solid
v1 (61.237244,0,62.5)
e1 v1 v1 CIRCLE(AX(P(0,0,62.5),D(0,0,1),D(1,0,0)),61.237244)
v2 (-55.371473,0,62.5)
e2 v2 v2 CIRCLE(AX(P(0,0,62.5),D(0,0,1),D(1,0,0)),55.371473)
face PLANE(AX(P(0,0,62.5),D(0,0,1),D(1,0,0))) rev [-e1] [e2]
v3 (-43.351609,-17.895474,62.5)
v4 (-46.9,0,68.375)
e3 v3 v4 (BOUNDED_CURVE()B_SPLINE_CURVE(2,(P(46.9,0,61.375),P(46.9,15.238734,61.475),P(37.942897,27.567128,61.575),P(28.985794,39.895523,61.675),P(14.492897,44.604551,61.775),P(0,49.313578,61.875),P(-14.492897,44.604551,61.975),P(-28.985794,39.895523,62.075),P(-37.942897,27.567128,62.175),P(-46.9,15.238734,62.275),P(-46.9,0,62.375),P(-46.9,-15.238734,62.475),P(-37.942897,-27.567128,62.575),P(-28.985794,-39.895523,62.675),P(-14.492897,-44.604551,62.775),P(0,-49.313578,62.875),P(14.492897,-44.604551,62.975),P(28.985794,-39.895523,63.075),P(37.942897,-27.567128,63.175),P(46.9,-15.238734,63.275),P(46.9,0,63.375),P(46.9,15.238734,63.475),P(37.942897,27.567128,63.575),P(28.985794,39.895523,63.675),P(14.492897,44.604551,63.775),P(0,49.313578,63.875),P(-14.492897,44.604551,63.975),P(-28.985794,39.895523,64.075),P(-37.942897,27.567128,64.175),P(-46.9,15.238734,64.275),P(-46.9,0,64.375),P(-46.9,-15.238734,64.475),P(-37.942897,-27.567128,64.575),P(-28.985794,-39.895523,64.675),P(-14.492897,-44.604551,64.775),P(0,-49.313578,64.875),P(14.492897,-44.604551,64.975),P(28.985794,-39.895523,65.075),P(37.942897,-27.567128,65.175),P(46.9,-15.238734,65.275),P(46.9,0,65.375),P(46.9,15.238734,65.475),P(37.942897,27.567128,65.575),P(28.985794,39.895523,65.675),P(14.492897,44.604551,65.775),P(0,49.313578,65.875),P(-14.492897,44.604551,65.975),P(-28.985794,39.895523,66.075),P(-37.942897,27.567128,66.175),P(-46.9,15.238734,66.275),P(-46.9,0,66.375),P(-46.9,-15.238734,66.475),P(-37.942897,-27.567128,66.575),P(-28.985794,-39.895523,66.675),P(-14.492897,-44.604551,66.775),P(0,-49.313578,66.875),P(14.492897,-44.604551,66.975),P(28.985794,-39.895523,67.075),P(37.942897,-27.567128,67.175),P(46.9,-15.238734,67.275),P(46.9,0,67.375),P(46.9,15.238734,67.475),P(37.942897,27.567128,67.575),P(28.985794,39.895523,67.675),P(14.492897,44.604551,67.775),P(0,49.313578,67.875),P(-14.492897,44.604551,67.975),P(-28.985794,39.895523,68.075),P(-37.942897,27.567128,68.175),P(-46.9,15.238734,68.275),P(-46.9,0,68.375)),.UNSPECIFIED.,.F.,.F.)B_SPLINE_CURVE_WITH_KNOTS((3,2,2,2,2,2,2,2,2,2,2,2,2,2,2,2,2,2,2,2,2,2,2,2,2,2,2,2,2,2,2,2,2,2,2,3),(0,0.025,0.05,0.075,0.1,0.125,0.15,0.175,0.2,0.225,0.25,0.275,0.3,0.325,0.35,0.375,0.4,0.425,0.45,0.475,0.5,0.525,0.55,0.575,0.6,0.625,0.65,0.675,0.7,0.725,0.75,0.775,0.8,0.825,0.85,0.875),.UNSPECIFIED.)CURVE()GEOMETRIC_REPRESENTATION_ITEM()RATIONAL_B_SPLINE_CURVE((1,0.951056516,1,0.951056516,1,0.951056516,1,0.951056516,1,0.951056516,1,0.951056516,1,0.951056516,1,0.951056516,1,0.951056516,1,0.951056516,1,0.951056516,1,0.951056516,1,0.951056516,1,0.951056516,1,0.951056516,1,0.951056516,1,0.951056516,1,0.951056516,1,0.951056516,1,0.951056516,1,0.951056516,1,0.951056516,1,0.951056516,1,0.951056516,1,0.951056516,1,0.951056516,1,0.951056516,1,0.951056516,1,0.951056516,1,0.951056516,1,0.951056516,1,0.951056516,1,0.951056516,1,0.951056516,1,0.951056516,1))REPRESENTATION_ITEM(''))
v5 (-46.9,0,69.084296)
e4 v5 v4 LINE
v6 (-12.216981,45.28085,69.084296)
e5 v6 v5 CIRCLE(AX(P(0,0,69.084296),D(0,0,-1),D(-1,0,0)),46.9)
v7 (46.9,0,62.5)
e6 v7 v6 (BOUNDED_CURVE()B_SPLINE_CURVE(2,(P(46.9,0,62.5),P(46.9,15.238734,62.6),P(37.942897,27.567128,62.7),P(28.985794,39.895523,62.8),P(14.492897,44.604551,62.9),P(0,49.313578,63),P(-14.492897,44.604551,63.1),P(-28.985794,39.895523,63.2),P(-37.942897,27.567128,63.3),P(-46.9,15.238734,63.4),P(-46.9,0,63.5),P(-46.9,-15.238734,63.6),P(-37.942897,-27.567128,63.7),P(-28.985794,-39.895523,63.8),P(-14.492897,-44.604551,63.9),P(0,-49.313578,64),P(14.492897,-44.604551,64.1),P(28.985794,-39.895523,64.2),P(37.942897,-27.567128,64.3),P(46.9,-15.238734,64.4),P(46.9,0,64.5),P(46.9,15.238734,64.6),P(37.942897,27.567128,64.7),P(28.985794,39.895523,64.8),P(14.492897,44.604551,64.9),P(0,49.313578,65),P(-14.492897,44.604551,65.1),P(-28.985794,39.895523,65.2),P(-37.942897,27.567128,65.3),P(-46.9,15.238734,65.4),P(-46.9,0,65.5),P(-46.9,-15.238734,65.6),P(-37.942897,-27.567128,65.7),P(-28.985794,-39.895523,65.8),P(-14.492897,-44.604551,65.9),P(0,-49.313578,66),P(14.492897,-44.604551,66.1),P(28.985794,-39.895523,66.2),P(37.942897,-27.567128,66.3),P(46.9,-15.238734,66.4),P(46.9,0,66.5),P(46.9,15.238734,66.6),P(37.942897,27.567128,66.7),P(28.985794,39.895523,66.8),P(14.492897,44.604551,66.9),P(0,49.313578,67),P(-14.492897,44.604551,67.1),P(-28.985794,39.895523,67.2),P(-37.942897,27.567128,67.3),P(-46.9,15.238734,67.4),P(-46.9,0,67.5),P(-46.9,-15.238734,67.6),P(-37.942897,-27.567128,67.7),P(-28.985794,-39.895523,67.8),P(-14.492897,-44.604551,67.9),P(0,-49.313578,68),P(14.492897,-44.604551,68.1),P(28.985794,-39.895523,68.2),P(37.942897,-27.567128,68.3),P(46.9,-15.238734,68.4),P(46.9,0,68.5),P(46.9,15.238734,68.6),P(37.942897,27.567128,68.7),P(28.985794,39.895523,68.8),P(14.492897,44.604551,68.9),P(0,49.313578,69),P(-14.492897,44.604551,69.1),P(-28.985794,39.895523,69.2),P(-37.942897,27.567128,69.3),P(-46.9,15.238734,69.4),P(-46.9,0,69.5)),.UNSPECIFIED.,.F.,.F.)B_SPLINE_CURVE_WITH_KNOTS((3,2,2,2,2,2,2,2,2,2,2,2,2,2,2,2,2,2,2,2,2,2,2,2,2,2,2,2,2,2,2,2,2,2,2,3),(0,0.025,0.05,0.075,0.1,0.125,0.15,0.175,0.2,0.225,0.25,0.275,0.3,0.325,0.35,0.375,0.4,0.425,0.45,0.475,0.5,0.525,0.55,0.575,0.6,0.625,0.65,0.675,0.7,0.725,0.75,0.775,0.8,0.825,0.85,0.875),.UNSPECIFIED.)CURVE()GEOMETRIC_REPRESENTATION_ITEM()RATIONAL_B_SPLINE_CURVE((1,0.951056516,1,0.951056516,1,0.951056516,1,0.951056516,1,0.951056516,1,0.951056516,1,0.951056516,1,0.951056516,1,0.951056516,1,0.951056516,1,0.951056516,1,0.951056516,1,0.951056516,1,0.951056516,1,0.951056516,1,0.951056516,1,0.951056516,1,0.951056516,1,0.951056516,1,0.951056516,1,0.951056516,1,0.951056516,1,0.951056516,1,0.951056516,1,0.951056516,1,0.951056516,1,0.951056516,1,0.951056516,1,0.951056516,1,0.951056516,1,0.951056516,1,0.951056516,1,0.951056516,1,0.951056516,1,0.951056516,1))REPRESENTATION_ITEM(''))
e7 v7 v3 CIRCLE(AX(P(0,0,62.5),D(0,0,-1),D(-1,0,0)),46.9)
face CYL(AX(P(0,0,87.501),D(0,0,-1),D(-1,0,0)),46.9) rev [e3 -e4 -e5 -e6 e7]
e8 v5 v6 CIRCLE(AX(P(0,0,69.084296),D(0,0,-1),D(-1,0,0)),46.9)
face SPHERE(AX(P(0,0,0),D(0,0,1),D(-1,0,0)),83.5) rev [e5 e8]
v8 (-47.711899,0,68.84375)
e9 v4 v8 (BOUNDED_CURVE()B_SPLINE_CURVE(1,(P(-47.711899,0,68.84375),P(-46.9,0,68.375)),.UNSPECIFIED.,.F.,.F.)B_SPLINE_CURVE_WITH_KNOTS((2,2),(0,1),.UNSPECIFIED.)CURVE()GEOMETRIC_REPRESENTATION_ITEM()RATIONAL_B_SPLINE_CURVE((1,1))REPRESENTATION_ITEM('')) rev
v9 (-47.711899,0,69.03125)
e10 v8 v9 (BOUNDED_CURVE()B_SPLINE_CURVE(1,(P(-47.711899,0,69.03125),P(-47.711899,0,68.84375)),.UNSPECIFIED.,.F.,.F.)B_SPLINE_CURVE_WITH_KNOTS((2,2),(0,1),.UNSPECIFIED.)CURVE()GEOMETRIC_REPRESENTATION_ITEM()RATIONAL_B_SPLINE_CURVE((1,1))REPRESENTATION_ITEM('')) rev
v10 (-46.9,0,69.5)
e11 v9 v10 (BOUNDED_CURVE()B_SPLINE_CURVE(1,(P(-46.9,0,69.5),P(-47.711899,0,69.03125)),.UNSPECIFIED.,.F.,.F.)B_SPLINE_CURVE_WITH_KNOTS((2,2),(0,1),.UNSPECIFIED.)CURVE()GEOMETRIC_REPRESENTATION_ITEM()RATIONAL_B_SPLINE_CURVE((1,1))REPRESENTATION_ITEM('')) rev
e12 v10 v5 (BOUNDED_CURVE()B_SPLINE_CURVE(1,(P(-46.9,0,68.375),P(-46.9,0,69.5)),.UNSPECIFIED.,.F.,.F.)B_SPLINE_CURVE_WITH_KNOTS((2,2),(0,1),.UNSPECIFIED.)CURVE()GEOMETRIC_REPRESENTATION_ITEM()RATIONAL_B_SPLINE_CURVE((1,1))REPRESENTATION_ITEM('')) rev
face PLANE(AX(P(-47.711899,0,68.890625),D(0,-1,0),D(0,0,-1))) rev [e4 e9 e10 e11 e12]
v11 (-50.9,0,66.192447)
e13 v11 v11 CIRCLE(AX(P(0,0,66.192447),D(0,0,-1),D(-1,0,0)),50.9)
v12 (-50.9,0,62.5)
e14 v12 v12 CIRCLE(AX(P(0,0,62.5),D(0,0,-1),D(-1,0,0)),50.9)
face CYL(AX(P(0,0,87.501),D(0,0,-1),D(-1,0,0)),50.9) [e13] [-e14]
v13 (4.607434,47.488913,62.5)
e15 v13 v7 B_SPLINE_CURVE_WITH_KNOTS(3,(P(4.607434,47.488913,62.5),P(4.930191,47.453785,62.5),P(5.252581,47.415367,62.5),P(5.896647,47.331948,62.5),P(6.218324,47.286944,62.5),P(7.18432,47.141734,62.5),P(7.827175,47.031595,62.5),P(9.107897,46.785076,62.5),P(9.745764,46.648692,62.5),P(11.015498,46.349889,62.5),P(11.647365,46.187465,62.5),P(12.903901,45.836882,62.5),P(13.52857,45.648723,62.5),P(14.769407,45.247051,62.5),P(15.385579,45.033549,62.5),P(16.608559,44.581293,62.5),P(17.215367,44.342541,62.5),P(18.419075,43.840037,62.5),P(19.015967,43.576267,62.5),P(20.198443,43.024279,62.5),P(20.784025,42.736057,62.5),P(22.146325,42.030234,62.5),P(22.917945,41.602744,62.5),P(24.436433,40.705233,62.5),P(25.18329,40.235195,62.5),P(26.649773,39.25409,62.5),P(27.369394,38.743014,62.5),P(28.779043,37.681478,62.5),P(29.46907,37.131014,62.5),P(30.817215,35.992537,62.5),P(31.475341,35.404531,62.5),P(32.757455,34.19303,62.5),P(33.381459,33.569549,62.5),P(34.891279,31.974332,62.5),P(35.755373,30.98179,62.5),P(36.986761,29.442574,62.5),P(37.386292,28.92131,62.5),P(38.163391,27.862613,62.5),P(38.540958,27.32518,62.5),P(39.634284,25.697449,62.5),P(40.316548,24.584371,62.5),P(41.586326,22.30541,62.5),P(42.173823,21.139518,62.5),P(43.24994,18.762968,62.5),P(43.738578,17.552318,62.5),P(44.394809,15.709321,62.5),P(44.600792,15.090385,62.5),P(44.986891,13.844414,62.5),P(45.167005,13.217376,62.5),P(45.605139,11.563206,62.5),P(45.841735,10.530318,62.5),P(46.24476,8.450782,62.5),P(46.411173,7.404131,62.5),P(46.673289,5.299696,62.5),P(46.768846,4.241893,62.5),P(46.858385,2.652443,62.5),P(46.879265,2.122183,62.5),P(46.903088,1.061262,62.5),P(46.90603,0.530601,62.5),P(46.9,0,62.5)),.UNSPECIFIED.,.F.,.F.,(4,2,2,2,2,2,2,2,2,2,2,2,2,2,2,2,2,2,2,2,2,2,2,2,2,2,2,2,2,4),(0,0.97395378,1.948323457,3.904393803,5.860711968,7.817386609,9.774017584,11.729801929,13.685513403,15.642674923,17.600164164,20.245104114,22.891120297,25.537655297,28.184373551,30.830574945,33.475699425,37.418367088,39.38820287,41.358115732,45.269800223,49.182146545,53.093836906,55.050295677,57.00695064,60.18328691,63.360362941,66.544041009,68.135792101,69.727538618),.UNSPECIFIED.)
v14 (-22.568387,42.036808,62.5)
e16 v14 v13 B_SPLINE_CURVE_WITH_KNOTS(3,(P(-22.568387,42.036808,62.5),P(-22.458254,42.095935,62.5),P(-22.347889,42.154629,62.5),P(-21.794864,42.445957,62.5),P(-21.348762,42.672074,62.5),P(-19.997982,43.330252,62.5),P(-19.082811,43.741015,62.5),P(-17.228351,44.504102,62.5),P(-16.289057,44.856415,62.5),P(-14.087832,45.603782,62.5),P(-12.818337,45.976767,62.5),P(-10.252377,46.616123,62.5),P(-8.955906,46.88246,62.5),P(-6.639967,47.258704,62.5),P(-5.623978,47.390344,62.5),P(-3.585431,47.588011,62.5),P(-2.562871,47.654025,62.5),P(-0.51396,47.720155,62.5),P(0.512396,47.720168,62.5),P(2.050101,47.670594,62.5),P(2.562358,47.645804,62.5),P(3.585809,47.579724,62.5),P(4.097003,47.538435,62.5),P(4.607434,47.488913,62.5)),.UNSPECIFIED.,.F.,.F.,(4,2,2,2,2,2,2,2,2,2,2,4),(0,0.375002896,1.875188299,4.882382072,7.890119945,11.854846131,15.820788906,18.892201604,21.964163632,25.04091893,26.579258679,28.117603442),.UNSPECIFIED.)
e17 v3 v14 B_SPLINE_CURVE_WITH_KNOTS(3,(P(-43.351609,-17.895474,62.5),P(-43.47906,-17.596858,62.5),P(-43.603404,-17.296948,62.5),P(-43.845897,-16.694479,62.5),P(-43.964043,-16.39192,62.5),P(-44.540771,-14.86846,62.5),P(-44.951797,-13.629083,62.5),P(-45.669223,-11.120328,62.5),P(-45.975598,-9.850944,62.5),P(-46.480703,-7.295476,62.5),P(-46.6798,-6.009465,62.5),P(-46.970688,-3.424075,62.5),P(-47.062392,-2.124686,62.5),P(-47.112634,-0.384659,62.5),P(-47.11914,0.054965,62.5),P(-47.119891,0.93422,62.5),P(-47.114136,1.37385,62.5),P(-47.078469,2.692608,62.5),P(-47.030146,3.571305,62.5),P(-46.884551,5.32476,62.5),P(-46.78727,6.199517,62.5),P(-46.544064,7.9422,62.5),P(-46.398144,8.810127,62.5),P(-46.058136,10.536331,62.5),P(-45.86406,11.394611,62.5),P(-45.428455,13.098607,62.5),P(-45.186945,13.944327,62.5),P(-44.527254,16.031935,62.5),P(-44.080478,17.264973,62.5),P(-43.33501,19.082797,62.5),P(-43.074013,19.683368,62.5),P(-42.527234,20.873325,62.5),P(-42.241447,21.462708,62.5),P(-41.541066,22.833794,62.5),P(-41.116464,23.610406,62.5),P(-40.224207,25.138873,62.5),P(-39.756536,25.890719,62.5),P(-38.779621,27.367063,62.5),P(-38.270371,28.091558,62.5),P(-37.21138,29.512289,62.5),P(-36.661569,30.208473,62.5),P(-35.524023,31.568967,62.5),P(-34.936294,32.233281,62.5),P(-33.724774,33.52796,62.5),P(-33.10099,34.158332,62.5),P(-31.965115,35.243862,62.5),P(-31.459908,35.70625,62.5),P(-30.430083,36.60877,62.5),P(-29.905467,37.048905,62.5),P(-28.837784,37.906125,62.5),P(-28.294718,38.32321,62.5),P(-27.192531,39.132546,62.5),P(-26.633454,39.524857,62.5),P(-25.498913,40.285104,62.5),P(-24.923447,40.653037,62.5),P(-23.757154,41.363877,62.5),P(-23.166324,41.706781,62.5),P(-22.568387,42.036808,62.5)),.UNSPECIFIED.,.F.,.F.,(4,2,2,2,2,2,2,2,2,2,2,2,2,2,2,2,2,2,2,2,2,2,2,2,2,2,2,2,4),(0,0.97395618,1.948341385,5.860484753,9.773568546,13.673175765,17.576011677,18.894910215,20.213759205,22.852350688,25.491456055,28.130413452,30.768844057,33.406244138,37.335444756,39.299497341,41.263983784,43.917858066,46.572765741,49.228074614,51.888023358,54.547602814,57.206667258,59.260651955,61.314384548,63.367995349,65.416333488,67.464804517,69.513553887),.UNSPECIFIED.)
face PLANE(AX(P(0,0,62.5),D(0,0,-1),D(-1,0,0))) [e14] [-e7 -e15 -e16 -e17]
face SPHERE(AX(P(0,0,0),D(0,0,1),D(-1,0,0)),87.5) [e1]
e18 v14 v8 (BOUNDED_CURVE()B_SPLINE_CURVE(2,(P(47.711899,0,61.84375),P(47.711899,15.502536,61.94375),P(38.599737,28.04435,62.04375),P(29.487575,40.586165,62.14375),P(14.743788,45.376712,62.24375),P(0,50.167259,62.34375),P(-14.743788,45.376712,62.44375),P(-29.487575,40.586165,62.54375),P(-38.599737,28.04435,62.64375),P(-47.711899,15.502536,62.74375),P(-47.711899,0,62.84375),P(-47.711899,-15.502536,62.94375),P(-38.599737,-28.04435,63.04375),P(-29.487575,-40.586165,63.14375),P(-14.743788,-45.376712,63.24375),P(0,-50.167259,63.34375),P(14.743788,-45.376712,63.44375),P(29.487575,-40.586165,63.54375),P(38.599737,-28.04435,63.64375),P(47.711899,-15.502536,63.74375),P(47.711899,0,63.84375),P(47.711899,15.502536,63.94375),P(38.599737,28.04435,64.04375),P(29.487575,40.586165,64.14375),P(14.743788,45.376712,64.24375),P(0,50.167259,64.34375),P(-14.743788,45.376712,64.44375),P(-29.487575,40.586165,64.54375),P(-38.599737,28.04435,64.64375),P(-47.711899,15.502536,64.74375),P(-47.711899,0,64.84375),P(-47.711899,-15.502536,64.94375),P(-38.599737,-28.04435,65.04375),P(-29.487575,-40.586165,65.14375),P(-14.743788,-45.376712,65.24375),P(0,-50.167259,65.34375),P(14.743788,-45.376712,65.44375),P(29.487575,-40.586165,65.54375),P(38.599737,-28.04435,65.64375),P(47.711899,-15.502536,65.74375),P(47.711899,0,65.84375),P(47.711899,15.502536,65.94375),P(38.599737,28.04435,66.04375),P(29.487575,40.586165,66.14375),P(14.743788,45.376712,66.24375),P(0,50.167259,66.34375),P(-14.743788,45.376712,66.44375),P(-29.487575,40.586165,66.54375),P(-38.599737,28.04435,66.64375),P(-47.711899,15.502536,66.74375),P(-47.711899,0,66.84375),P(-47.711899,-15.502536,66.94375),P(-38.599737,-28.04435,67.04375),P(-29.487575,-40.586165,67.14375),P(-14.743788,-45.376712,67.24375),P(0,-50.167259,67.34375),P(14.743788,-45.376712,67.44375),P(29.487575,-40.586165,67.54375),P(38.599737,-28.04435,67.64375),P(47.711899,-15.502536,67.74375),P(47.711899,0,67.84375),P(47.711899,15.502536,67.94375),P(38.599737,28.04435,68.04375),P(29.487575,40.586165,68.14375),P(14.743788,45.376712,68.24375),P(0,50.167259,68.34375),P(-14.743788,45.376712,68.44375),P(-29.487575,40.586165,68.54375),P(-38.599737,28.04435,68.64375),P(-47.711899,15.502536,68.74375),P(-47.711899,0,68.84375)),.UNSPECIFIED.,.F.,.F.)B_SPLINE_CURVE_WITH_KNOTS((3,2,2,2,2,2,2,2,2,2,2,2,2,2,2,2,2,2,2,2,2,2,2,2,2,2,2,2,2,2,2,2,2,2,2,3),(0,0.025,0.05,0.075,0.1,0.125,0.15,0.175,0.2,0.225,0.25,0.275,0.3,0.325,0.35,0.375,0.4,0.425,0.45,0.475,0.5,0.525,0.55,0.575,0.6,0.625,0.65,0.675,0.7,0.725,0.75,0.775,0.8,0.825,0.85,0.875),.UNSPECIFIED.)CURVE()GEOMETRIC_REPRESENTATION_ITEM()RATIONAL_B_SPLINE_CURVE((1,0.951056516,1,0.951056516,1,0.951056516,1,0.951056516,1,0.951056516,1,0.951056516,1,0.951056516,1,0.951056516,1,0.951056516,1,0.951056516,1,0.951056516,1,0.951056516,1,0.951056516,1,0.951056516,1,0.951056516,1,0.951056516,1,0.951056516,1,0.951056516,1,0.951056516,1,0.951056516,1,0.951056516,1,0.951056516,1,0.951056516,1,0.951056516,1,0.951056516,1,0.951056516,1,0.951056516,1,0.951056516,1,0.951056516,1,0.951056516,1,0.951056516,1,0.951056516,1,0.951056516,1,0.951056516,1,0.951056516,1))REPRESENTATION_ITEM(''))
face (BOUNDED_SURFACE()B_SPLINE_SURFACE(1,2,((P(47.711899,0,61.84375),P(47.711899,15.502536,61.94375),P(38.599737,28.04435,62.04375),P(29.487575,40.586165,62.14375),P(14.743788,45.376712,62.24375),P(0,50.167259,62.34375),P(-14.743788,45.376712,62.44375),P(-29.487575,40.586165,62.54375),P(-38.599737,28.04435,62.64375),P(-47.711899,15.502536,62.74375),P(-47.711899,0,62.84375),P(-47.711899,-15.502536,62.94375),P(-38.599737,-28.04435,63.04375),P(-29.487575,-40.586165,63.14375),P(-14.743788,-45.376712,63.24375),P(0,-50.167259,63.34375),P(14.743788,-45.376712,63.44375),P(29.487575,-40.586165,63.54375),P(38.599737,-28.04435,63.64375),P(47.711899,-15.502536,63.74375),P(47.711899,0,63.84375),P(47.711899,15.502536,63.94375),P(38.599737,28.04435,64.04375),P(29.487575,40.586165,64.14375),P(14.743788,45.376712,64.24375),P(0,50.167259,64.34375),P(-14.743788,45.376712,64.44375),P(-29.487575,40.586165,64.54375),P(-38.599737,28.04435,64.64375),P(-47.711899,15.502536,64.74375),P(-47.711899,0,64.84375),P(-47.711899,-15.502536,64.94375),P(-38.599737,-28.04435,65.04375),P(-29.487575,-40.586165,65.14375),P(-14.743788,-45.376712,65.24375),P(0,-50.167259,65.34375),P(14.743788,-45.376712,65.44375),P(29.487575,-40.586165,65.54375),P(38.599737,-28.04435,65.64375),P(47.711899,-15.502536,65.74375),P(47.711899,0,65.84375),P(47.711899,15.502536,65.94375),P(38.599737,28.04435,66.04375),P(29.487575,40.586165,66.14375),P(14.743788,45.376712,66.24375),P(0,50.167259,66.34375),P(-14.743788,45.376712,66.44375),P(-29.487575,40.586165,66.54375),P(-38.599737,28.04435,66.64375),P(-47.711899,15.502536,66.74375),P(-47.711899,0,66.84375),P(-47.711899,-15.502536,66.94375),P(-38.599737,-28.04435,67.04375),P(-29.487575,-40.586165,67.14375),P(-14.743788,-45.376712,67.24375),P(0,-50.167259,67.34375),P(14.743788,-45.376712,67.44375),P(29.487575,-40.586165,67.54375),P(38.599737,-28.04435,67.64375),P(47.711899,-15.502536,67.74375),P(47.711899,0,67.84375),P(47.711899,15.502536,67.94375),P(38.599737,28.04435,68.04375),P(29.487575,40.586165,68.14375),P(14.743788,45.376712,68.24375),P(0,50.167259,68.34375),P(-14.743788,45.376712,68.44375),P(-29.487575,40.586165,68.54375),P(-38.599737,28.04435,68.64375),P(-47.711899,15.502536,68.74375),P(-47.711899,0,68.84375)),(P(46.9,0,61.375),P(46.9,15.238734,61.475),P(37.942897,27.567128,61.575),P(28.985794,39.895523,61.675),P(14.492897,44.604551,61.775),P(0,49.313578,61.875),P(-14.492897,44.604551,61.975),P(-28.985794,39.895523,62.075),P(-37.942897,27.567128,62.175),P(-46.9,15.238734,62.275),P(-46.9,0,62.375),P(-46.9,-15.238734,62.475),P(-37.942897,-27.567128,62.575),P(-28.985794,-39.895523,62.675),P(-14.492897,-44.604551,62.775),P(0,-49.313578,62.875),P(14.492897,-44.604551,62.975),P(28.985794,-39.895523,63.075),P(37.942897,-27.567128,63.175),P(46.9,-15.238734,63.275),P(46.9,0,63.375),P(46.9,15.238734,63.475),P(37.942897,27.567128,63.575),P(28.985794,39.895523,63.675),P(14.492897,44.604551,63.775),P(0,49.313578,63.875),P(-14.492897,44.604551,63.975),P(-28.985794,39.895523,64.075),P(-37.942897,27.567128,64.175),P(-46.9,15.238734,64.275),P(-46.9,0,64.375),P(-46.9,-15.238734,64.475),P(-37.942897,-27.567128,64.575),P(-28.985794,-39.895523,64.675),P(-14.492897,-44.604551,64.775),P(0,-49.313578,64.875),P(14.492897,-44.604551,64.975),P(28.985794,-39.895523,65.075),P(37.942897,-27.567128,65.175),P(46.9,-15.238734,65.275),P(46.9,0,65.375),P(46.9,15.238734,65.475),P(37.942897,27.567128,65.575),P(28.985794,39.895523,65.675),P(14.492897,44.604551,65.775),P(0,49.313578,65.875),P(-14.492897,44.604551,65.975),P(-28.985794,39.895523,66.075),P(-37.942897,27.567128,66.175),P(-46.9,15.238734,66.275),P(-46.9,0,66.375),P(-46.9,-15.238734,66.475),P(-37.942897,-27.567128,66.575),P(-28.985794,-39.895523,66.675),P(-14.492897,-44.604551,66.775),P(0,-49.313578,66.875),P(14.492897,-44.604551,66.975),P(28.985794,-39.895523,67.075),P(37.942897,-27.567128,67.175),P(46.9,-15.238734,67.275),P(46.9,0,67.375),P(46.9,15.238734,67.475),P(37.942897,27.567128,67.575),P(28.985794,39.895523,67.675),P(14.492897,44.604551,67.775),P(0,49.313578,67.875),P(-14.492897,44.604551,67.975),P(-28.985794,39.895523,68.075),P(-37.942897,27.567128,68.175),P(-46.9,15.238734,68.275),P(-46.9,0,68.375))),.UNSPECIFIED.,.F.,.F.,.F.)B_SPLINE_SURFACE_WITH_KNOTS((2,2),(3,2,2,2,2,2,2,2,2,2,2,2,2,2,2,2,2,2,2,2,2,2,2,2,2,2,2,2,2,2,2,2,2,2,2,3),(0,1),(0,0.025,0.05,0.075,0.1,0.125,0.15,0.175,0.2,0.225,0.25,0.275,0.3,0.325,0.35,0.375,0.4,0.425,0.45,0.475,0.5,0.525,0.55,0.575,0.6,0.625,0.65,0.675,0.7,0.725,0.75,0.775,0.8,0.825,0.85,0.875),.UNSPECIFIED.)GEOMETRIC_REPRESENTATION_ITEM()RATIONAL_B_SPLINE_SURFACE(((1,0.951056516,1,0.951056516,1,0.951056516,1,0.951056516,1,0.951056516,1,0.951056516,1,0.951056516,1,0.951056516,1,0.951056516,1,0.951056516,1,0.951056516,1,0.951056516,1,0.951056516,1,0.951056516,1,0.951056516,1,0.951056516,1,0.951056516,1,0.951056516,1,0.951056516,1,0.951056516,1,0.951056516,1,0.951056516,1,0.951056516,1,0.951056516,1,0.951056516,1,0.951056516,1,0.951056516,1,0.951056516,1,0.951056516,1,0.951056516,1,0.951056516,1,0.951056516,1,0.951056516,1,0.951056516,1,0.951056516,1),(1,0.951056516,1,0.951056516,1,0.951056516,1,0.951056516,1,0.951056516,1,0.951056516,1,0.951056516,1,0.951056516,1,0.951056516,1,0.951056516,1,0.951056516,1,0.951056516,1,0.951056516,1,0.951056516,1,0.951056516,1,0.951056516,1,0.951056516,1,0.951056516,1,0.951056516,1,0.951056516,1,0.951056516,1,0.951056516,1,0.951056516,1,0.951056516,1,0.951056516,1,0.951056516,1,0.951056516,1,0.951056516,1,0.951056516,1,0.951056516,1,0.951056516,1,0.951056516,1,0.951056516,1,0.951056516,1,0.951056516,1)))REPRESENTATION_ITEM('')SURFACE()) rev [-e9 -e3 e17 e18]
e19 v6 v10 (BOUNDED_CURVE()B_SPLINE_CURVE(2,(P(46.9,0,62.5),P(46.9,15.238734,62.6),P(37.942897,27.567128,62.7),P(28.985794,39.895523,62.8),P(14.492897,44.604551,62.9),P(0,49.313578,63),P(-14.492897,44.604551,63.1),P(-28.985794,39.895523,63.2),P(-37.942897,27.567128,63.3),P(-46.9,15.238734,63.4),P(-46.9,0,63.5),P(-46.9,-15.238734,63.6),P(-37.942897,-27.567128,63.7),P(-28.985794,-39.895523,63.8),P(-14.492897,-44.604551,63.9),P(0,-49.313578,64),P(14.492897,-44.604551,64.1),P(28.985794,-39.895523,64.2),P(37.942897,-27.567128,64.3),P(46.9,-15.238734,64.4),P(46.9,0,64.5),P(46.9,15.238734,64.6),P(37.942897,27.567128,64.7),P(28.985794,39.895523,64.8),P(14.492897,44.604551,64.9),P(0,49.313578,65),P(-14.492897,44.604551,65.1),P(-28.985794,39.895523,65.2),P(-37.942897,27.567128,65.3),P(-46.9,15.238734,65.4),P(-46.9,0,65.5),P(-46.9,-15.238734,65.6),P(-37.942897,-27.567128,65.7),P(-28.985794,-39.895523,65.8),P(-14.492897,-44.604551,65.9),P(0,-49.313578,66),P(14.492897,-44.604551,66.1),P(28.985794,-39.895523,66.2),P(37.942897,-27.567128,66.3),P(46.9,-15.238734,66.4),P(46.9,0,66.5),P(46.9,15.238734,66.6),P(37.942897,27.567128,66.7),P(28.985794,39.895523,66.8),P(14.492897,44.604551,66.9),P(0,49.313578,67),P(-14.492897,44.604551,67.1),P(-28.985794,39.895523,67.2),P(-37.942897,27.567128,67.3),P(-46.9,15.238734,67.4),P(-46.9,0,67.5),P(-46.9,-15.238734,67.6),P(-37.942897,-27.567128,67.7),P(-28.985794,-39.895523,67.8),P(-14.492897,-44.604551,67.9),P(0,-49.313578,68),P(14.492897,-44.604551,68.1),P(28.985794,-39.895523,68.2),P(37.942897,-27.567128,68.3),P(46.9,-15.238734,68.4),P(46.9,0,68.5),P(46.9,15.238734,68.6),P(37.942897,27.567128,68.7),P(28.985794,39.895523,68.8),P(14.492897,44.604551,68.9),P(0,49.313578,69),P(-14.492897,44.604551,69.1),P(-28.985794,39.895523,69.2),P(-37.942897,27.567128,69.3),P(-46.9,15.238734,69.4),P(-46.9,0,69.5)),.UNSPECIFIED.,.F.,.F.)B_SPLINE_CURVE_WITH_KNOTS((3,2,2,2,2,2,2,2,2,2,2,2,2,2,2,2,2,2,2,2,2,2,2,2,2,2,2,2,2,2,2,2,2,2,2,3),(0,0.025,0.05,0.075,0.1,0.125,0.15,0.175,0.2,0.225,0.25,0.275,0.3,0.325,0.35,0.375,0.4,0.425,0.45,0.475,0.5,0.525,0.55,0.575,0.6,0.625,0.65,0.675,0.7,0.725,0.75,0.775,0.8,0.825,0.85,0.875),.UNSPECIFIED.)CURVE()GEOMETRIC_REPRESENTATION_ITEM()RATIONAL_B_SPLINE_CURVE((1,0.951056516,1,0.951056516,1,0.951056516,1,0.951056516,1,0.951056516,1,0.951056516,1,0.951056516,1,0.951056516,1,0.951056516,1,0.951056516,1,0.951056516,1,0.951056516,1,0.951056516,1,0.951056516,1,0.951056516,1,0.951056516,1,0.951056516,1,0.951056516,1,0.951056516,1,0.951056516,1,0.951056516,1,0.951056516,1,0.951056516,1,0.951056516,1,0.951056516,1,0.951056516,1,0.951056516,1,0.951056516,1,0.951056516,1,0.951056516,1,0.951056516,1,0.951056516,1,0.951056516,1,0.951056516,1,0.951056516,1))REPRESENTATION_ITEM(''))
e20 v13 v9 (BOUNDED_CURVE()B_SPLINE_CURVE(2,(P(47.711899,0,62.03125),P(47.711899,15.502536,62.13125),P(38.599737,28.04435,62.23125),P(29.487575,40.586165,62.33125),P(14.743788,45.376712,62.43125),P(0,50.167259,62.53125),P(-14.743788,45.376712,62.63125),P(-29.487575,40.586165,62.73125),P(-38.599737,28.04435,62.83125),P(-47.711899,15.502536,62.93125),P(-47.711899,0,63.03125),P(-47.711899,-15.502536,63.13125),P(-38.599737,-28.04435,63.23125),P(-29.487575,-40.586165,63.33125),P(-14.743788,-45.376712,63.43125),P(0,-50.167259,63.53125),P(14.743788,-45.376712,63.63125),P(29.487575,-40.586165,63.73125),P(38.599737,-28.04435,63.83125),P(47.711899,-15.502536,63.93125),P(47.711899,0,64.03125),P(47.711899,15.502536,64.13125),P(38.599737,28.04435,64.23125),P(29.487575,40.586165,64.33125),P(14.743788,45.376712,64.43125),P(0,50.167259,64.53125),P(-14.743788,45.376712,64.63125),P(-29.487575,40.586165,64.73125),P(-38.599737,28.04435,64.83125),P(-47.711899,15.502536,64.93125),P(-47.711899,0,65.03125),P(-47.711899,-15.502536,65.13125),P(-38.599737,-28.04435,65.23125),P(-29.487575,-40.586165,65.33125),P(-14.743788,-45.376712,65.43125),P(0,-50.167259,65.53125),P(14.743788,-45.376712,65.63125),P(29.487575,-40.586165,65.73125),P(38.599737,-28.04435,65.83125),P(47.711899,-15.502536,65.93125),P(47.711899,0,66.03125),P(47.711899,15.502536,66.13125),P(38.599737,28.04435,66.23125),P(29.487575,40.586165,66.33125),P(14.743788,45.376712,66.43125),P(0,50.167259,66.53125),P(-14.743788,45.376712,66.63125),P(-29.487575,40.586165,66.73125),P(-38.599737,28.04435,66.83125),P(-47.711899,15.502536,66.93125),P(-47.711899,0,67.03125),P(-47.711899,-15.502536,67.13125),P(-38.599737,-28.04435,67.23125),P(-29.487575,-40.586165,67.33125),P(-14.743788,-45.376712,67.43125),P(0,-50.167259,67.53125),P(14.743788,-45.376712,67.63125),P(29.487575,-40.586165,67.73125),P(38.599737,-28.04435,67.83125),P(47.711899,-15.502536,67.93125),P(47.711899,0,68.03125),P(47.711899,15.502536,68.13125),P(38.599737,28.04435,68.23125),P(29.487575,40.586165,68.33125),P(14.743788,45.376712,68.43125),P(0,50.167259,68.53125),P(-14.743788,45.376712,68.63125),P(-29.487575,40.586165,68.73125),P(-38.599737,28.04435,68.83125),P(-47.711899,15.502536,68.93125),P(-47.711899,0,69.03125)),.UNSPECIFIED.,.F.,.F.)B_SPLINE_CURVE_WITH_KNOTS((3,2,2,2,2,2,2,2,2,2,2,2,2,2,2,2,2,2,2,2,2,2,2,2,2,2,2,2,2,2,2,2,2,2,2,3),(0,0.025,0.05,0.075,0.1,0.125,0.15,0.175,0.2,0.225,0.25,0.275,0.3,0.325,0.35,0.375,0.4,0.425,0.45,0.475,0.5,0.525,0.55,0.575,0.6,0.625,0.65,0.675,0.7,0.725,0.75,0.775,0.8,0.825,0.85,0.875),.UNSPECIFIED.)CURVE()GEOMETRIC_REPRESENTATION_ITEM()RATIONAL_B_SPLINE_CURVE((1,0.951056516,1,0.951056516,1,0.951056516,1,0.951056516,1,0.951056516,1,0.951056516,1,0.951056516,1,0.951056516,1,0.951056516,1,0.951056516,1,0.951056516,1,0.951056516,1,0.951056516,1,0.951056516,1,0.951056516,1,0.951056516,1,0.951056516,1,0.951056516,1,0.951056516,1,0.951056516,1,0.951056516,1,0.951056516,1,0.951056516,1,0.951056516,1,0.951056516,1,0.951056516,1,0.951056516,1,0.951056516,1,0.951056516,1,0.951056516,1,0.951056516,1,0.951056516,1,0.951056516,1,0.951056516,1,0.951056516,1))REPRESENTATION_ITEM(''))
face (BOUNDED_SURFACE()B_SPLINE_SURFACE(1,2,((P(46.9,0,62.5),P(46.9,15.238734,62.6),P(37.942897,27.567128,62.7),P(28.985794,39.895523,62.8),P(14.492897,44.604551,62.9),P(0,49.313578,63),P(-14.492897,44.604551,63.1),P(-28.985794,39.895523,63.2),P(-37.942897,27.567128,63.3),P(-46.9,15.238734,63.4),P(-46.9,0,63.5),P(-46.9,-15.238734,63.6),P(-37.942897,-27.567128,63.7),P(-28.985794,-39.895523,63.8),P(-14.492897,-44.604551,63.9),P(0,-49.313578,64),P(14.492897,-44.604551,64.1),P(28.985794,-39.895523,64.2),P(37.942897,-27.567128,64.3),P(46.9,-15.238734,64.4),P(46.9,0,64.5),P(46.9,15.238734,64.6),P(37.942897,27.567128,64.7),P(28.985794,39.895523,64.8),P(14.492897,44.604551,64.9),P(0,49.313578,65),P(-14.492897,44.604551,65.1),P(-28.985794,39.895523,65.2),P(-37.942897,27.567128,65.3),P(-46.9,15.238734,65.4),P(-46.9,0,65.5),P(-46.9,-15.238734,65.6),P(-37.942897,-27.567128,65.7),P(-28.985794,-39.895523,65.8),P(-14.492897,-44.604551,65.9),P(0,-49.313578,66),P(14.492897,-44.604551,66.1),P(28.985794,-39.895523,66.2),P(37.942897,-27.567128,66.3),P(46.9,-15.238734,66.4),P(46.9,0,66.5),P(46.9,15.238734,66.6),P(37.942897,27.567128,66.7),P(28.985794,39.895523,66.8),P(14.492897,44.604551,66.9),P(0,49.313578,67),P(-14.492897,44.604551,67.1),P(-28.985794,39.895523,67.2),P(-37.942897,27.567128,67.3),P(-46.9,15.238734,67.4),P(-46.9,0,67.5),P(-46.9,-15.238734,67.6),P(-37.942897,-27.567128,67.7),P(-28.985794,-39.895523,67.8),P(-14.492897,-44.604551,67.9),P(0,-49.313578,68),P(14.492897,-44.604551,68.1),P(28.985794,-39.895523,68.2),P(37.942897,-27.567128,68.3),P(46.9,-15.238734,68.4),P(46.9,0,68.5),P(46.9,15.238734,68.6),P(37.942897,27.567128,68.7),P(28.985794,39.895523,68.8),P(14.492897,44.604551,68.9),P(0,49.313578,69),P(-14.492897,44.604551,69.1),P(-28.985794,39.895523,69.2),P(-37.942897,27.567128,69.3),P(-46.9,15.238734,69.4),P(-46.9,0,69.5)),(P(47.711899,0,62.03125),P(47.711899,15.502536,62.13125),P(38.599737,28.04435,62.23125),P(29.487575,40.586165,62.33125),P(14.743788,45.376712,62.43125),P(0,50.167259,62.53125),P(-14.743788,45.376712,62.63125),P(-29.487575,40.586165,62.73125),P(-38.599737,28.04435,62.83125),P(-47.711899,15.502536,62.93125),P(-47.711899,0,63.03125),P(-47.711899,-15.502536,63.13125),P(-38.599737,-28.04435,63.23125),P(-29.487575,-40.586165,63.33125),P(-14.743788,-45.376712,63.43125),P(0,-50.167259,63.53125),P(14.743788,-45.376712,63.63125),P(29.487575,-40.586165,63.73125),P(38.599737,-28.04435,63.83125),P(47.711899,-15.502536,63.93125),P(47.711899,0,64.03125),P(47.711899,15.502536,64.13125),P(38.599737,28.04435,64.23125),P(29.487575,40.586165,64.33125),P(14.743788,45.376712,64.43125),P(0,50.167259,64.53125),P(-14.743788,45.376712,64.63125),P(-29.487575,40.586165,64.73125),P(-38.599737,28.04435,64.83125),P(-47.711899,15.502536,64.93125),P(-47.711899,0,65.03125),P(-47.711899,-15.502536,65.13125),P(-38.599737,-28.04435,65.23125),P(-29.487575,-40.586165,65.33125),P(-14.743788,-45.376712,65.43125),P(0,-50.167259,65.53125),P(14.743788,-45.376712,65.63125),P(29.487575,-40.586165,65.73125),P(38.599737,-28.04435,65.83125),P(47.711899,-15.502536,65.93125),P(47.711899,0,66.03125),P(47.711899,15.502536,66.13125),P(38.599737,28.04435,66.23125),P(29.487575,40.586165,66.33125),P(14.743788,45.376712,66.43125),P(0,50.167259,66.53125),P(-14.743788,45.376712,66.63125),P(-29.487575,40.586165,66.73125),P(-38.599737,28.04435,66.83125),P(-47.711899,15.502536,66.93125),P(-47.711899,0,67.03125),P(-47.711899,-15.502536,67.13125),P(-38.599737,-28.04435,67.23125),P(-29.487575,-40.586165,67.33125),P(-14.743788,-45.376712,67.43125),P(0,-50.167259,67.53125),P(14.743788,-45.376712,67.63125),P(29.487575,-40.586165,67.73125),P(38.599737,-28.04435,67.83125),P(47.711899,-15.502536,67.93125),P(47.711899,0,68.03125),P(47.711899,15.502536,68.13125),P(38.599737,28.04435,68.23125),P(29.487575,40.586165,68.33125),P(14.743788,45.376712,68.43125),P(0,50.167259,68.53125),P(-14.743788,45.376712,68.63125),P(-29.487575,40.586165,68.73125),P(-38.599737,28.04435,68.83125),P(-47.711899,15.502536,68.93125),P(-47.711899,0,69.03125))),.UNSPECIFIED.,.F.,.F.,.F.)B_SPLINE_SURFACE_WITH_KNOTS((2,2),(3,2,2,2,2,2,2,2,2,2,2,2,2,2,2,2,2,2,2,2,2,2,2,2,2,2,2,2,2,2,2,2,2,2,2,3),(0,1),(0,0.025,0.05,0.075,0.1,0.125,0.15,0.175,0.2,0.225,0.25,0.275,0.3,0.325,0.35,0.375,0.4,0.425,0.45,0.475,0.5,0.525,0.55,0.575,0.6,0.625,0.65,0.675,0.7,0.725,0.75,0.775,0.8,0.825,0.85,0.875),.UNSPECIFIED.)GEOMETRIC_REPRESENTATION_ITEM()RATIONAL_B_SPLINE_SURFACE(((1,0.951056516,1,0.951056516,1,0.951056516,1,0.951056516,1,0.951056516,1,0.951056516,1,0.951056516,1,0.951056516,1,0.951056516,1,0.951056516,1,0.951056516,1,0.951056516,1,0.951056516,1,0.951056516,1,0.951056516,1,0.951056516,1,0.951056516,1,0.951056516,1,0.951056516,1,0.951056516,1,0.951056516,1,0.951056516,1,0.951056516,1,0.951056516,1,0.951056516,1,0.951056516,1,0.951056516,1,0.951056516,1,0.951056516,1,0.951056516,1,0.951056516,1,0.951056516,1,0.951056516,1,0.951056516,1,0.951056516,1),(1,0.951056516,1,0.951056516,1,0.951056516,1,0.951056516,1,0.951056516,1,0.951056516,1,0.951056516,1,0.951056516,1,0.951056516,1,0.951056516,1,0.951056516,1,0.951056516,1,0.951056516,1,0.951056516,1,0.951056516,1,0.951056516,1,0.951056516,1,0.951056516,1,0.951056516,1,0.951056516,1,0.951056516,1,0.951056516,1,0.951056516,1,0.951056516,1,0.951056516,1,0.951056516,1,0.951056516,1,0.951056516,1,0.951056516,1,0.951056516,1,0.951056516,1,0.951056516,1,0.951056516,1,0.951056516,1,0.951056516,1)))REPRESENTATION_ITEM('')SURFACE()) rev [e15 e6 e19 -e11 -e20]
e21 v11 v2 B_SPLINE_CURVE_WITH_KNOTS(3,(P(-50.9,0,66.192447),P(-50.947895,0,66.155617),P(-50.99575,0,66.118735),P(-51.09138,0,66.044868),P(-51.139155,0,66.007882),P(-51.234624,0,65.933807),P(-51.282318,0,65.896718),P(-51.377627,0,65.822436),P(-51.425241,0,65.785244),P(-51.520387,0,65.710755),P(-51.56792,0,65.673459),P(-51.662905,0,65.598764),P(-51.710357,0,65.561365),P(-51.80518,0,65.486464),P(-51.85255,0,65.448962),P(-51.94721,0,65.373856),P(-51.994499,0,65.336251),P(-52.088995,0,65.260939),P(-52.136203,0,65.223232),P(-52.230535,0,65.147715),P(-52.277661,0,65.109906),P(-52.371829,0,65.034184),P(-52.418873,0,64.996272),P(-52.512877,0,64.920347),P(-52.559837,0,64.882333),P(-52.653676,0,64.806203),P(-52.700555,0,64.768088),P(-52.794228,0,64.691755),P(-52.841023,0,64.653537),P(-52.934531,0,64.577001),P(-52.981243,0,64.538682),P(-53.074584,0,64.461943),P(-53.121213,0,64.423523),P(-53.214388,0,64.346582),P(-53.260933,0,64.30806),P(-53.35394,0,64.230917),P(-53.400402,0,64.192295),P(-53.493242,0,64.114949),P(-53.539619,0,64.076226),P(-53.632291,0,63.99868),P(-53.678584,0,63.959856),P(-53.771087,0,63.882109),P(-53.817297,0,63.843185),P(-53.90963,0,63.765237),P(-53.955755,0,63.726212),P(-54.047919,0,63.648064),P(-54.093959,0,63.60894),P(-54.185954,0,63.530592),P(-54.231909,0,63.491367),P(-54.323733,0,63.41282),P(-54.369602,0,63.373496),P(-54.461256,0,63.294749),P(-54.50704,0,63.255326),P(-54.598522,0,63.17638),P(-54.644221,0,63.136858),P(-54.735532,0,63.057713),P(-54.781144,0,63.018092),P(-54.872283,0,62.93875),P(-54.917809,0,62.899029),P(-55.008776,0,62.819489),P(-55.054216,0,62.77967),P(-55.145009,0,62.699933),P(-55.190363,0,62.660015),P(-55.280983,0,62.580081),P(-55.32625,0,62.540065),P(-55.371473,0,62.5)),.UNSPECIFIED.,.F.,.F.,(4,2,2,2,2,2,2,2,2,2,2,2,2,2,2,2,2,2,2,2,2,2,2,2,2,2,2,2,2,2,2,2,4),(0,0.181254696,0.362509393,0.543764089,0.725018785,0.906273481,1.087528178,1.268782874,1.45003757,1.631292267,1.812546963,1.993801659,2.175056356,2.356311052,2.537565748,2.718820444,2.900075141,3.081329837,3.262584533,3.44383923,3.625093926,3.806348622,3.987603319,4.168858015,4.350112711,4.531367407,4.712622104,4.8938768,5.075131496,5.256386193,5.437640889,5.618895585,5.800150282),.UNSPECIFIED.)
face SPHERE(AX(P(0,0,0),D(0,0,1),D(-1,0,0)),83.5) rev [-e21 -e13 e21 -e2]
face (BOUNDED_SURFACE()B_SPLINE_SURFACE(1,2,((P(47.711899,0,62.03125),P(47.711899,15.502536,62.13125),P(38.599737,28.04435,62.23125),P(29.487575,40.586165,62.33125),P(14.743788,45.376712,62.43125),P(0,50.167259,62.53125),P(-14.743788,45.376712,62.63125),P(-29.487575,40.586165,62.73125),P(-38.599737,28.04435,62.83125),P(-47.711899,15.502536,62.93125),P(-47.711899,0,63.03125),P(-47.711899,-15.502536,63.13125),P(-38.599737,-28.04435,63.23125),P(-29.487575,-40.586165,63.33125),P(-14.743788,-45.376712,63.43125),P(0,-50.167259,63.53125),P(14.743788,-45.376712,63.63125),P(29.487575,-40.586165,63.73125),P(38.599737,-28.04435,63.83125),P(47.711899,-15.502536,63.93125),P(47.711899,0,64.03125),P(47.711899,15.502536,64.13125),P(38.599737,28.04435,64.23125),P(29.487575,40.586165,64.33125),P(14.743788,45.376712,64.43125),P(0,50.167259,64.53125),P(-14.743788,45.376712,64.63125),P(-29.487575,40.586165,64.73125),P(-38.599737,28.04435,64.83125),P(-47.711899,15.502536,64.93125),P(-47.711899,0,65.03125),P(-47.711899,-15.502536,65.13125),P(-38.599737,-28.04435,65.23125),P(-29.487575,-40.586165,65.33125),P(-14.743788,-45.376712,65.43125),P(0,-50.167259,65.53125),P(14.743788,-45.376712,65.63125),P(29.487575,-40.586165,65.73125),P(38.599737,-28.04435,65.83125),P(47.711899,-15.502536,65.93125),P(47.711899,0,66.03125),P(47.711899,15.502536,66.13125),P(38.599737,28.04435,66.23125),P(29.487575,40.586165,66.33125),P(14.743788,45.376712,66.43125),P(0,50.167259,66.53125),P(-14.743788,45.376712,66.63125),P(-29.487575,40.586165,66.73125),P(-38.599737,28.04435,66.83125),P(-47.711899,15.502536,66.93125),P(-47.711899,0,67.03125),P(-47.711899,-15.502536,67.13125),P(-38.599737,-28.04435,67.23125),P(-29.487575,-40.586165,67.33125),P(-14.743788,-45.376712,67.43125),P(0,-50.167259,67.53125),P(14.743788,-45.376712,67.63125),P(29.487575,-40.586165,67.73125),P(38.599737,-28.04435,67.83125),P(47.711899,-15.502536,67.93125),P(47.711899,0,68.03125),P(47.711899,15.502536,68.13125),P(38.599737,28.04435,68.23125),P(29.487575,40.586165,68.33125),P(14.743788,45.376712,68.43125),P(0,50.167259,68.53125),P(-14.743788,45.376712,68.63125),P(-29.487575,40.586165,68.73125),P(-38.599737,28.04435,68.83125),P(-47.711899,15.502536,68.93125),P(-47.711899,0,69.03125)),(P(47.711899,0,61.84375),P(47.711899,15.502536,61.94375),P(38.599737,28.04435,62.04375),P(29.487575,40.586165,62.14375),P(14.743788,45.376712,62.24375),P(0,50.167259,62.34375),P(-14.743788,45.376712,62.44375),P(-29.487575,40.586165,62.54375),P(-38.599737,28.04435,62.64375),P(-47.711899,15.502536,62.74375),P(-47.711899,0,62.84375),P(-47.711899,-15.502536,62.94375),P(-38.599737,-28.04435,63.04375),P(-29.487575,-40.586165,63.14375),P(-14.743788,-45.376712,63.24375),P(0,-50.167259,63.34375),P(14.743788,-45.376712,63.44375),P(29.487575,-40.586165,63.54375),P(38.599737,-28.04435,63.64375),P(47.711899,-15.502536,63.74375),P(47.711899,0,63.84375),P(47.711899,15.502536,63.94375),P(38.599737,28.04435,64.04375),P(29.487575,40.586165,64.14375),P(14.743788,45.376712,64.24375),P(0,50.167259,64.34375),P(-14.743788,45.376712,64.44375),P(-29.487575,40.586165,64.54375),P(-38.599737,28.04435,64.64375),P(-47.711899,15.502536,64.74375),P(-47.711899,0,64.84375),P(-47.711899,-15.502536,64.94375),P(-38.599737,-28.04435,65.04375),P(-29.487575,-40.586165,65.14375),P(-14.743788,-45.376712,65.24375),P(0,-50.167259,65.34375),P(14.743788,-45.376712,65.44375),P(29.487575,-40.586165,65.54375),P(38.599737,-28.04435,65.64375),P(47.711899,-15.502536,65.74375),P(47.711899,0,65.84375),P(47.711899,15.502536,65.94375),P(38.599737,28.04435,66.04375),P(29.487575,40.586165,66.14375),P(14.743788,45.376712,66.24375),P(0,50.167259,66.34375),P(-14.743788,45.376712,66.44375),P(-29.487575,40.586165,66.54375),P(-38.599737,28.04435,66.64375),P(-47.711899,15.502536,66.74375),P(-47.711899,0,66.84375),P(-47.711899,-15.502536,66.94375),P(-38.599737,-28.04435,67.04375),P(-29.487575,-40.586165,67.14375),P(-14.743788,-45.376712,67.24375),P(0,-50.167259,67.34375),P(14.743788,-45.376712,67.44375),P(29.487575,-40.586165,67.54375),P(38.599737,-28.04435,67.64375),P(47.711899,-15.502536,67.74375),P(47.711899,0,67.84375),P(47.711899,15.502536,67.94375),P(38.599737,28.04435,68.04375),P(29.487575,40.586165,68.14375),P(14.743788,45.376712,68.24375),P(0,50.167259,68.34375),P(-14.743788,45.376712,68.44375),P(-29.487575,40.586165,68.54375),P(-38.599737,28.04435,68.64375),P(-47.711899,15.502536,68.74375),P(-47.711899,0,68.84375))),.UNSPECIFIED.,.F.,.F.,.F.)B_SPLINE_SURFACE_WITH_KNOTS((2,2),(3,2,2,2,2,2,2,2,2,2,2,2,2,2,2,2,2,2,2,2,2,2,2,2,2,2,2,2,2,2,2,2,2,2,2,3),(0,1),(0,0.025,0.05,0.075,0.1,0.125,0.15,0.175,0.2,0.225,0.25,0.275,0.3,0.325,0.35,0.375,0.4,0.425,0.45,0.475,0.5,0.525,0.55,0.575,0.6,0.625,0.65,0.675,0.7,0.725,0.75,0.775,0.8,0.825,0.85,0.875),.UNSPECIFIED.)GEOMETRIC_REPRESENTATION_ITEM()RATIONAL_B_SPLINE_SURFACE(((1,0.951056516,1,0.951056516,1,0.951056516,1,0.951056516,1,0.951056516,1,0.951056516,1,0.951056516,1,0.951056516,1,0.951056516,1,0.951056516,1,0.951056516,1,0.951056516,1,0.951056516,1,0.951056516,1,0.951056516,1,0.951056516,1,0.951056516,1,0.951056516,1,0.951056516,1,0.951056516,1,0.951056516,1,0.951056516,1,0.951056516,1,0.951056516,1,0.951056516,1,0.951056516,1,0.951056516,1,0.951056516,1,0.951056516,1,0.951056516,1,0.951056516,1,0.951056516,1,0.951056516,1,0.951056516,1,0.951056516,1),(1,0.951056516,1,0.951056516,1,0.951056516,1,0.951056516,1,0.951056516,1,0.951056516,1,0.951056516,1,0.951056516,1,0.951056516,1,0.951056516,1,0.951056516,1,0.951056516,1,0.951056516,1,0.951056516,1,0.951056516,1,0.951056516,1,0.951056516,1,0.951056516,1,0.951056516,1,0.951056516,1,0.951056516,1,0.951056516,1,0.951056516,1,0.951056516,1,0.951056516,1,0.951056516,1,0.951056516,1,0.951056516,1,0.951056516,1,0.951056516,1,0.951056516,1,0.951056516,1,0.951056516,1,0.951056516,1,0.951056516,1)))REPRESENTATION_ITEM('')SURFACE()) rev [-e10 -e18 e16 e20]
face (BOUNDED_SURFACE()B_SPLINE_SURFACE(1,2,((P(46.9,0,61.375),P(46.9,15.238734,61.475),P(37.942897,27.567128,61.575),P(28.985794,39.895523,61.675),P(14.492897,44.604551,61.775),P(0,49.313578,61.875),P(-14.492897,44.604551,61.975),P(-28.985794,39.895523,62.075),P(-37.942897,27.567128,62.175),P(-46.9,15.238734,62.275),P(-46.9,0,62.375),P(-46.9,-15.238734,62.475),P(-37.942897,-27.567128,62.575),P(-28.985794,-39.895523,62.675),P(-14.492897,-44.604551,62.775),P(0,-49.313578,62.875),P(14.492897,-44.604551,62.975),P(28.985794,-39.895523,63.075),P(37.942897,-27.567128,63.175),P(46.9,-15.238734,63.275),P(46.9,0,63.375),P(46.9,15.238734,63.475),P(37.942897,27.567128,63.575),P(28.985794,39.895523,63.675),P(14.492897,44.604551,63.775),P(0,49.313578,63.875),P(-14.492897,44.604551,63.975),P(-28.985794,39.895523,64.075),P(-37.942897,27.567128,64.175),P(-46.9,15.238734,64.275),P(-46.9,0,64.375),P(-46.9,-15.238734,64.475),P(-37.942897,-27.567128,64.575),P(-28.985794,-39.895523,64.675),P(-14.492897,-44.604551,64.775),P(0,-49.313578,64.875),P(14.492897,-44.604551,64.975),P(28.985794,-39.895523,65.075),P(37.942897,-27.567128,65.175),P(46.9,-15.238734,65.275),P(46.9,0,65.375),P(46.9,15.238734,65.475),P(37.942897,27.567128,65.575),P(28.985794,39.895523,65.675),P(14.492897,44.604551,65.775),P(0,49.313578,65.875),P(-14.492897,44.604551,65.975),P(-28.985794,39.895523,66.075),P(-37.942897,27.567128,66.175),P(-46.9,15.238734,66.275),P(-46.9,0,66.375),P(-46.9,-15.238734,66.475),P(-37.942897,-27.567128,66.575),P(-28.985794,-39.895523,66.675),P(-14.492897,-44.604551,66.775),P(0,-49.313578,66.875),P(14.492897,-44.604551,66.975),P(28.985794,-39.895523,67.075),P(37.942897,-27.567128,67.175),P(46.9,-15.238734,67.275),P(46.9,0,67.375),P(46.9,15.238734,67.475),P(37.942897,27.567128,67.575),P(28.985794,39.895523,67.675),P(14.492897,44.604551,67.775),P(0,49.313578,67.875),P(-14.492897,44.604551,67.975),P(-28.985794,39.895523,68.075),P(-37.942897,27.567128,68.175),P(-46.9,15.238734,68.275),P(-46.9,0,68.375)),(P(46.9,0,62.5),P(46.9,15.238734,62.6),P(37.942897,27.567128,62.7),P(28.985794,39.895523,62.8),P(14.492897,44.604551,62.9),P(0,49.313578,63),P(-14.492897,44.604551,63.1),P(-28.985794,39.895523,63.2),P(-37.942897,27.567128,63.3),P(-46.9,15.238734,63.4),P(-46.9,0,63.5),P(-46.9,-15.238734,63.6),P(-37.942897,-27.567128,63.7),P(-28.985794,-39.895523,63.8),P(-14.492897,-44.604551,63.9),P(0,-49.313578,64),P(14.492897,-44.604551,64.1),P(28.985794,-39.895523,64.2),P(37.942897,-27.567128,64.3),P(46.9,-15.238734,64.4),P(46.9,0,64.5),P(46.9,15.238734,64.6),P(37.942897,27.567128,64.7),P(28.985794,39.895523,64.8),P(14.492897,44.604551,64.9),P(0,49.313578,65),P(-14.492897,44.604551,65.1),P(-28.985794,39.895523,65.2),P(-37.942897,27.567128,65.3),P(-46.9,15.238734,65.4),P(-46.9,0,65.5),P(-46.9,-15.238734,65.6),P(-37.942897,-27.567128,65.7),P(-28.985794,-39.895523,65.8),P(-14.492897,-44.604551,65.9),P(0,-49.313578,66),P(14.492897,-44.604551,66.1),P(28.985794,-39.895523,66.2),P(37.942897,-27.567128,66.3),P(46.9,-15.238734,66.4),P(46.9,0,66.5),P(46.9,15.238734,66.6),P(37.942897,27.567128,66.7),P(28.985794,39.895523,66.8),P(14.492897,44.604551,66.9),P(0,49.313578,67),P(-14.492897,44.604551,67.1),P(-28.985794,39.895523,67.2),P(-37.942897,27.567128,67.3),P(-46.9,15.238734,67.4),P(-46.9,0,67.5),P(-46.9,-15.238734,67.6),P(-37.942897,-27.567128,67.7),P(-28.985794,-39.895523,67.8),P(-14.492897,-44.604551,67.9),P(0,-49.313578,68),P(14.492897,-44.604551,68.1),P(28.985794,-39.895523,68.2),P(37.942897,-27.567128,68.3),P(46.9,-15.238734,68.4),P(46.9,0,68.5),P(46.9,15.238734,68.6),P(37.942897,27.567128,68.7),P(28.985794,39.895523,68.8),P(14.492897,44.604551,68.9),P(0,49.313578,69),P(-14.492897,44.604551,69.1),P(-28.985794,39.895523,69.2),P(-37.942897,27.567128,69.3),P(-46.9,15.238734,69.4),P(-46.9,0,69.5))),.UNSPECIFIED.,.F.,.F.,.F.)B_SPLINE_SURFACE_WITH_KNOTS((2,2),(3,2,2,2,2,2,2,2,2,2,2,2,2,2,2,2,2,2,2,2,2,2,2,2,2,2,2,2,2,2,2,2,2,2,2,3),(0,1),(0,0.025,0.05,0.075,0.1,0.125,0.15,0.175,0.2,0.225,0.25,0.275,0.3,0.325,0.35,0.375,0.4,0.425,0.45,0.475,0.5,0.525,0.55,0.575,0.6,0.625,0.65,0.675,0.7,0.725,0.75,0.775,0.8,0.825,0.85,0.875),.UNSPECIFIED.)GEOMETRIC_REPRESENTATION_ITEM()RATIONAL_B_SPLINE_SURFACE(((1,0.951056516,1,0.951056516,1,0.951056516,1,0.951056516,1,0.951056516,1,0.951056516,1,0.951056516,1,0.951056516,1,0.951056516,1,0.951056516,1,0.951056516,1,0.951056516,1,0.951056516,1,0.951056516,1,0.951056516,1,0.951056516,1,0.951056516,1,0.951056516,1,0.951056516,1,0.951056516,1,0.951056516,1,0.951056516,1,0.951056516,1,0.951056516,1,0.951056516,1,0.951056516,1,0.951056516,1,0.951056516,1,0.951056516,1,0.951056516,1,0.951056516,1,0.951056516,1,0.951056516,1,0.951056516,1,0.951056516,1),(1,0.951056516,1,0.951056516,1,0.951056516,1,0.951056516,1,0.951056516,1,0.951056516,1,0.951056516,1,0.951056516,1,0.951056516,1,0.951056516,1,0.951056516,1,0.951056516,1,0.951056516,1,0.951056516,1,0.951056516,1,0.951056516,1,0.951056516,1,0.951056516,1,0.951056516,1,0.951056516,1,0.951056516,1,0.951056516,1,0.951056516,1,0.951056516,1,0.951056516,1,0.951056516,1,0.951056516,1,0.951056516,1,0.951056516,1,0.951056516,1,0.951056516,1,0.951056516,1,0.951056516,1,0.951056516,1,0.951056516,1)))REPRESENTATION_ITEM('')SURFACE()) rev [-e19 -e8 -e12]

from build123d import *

# Parameters (mm, degrees)
SKETCH2_R                       = 50.9
SKETCH2_R_2                     = 46.9
BOSS_EXTRUDE1_DEPTH             = 5
BOSS_EXTRUDE1_DIRECTION_2_REACH = 90.882
THREAD1_PITCH                   = 2


with BuildPart() as part:
    # Sketch1 → Revolve1 (revolve)
    with BuildSketch(Plane(origin=(0, 0, 0), x_dir=(1, 0, 0), z_dir=(0, 1, 0))):
        with BuildLine():
            ThreePointArc((-61.23724357, -62.5), (-33.071891388, -81.00925873), (0, -87.5))
            Line((0, -87.5), (0, -83.5))
            ThreePointArc((0, -83.5), (-29.609964539, -78.073683146), (-55.3714728, -62.5))
            Line((-55.3714728, -62.5), (-61.23724357, -62.5))
        make_face()
    revolve(axis=Axis((0, 0, 87.5), (0, 0, -1)))

    # Sketch2 → Boss-Extrude1 (add)
    with BuildSketch(Plane(origin=(0, 0, 67.5), x_dir=(-1, 0, 0), z_dir=(0, 0, -1))):
        Circle(SKETCH2_R)
        Circle(SKETCH2_R_2, mode=Mode.SUBTRACT)
    extrude(amount=BOSS_EXTRUDE1_DEPTH)

    # Sketch2 → Boss-Extrude1 direction 2 (add, up to next)
    with BuildSketch(Plane(origin=(0, 0, 67.5), x_dir=(-1, 0, 0), z_dir=(0, 0, -1)), mode=Mode.PRIVATE) as boss_extrude1_direction_2_sk1:
        Circle(SKETCH2_R)
        Circle(SKETCH2_R_2, mode=Mode.SUBTRACT)
    boss_extrude1_direction_2_tool1 = extrude(boss_extrude1_direction_2_sk1.sketch, amount=-BOSS_EXTRUDE1_DIRECTION_2_REACH, mode=Mode.PRIVATE) - part.part
    add(boss_extrude1_direction_2_tool1.solids().sort_by_distance((49.460331, 0, 67.5))[0])

    # Thread1: arcs per turn and ends read off the stored shape
    # Thread1: the profile of Thread Profile1 profile screwed along a right-hand helix through 3.5 turns, 10 arcs to a turn; built about Z, then put on its axis
    thread1_z = Axis((0, 0, 0), (0, 0, 1))
    thread1_corners = [(-46.8997, 0, -7.000173205), (-47.711898812, 0, -6.531250002), (-47.711898812, 0, -6.343750002), (-46.8997, 0, -5.874826799)]
    with BuildLine(mode=Mode.PRIVATE) as thread1_profile:
        Line(thread1_corners[0], thread1_corners[1])
        Line(thread1_corners[1], thread1_corners[2])
        Line(thread1_corners[2], thread1_corners[3])
        Line(thread1_corners[3], thread1_corners[0])
    thread1_cap = Face(thread1_profile.wire())
    thread1_turn_angles = [0, 18, 36, 54, 72, 90, 108, 126, 144, 162, 180, 198, 216, 234, 252, 270, 288, 306, 324, 342, 360]
    thread1_turn_weights = [1, 0.9510565162951535, 1, 0.9510565162951535, 1, 0.9510565162951535, 1, 0.9510565162951535, 1, 0.9510565162951535, 1, 0.9510565162951535, 1, 0.9510565162951535, 1, 0.9510565162951535, 1, 0.9510565162951535, 1, 0.9510565162951535, 1]
    thread1_turn_rails = [Edge.make_bspline([Vector(p[0], p[1], 0).rotate(thread1_z, thread1_turn_angles[k]) / thread1_turn_weights[k] + Vector(0, 0, p[2] + THREAD1_PITCH * thread1_turn_angles[k] / 360) for k in range(21)], [0, 0, 0, 1, 1, 2, 2, 3, 3, 4, 4, 5, 5, 6, 6, 7, 7, 8, 8, 9, 9, 10, 10, 10], 2, thread1_turn_weights) for p in thread1_corners]
    thread1_turn_sides = [Face.make_surface_from_curves(thread1_turn_rails[p[0]], thread1_turn_rails[p[1]]) for p in [(0, 1), (1, 2), (2, 3), (3, 0)]]
    thread1_last_angles = [1080, 1098, 1116, 1134, 1152, 1170, 1188, 1206, 1224, 1242, 1260]
    thread1_last_weights = [1, 0.9510565162951535, 1, 0.9510565162951535, 1, 0.9510565162951535, 1, 0.9510565162951535, 1, 0.9510565162951535, 1]
    thread1_last_rails = [Edge.make_bspline([Vector(p[0], p[1], 0).rotate(thread1_z, thread1_last_angles[k]) / thread1_last_weights[k] + Vector(0, 0, p[2] + THREAD1_PITCH * thread1_last_angles[k] / 360) for k in range(11)], [0, 0, 0, 1, 1, 2, 2, 3, 3, 4, 4, 5, 5, 5], 2, thread1_last_weights) for p in thread1_corners]
    thread1_last_sides = [Face.make_surface_from_curves(thread1_last_rails[p[0]], thread1_last_rails[p[1]]) for p in [(0, 1), (1, 2), (2, 3), (3, 0)]]
    thread1 = Plane(origin=(0, 0, 62.5), x_dir=(1, 0, 0), z_dir=(0, 0, -1)) * Solid(Shell([*[p.moved(Location((0, 0, THREAD1_PITCH * i))) for i in range(3) for p in thread1_turn_sides], *thread1_last_sides, thread1_cap, thread1_cap.rotate(thread1_z, 1260).moved(Location((0, 0, THREAD1_PITCH * 1260 / 360)))]))
    add(thread1, mode=Mode.SUBTRACT)


solid = part.part
